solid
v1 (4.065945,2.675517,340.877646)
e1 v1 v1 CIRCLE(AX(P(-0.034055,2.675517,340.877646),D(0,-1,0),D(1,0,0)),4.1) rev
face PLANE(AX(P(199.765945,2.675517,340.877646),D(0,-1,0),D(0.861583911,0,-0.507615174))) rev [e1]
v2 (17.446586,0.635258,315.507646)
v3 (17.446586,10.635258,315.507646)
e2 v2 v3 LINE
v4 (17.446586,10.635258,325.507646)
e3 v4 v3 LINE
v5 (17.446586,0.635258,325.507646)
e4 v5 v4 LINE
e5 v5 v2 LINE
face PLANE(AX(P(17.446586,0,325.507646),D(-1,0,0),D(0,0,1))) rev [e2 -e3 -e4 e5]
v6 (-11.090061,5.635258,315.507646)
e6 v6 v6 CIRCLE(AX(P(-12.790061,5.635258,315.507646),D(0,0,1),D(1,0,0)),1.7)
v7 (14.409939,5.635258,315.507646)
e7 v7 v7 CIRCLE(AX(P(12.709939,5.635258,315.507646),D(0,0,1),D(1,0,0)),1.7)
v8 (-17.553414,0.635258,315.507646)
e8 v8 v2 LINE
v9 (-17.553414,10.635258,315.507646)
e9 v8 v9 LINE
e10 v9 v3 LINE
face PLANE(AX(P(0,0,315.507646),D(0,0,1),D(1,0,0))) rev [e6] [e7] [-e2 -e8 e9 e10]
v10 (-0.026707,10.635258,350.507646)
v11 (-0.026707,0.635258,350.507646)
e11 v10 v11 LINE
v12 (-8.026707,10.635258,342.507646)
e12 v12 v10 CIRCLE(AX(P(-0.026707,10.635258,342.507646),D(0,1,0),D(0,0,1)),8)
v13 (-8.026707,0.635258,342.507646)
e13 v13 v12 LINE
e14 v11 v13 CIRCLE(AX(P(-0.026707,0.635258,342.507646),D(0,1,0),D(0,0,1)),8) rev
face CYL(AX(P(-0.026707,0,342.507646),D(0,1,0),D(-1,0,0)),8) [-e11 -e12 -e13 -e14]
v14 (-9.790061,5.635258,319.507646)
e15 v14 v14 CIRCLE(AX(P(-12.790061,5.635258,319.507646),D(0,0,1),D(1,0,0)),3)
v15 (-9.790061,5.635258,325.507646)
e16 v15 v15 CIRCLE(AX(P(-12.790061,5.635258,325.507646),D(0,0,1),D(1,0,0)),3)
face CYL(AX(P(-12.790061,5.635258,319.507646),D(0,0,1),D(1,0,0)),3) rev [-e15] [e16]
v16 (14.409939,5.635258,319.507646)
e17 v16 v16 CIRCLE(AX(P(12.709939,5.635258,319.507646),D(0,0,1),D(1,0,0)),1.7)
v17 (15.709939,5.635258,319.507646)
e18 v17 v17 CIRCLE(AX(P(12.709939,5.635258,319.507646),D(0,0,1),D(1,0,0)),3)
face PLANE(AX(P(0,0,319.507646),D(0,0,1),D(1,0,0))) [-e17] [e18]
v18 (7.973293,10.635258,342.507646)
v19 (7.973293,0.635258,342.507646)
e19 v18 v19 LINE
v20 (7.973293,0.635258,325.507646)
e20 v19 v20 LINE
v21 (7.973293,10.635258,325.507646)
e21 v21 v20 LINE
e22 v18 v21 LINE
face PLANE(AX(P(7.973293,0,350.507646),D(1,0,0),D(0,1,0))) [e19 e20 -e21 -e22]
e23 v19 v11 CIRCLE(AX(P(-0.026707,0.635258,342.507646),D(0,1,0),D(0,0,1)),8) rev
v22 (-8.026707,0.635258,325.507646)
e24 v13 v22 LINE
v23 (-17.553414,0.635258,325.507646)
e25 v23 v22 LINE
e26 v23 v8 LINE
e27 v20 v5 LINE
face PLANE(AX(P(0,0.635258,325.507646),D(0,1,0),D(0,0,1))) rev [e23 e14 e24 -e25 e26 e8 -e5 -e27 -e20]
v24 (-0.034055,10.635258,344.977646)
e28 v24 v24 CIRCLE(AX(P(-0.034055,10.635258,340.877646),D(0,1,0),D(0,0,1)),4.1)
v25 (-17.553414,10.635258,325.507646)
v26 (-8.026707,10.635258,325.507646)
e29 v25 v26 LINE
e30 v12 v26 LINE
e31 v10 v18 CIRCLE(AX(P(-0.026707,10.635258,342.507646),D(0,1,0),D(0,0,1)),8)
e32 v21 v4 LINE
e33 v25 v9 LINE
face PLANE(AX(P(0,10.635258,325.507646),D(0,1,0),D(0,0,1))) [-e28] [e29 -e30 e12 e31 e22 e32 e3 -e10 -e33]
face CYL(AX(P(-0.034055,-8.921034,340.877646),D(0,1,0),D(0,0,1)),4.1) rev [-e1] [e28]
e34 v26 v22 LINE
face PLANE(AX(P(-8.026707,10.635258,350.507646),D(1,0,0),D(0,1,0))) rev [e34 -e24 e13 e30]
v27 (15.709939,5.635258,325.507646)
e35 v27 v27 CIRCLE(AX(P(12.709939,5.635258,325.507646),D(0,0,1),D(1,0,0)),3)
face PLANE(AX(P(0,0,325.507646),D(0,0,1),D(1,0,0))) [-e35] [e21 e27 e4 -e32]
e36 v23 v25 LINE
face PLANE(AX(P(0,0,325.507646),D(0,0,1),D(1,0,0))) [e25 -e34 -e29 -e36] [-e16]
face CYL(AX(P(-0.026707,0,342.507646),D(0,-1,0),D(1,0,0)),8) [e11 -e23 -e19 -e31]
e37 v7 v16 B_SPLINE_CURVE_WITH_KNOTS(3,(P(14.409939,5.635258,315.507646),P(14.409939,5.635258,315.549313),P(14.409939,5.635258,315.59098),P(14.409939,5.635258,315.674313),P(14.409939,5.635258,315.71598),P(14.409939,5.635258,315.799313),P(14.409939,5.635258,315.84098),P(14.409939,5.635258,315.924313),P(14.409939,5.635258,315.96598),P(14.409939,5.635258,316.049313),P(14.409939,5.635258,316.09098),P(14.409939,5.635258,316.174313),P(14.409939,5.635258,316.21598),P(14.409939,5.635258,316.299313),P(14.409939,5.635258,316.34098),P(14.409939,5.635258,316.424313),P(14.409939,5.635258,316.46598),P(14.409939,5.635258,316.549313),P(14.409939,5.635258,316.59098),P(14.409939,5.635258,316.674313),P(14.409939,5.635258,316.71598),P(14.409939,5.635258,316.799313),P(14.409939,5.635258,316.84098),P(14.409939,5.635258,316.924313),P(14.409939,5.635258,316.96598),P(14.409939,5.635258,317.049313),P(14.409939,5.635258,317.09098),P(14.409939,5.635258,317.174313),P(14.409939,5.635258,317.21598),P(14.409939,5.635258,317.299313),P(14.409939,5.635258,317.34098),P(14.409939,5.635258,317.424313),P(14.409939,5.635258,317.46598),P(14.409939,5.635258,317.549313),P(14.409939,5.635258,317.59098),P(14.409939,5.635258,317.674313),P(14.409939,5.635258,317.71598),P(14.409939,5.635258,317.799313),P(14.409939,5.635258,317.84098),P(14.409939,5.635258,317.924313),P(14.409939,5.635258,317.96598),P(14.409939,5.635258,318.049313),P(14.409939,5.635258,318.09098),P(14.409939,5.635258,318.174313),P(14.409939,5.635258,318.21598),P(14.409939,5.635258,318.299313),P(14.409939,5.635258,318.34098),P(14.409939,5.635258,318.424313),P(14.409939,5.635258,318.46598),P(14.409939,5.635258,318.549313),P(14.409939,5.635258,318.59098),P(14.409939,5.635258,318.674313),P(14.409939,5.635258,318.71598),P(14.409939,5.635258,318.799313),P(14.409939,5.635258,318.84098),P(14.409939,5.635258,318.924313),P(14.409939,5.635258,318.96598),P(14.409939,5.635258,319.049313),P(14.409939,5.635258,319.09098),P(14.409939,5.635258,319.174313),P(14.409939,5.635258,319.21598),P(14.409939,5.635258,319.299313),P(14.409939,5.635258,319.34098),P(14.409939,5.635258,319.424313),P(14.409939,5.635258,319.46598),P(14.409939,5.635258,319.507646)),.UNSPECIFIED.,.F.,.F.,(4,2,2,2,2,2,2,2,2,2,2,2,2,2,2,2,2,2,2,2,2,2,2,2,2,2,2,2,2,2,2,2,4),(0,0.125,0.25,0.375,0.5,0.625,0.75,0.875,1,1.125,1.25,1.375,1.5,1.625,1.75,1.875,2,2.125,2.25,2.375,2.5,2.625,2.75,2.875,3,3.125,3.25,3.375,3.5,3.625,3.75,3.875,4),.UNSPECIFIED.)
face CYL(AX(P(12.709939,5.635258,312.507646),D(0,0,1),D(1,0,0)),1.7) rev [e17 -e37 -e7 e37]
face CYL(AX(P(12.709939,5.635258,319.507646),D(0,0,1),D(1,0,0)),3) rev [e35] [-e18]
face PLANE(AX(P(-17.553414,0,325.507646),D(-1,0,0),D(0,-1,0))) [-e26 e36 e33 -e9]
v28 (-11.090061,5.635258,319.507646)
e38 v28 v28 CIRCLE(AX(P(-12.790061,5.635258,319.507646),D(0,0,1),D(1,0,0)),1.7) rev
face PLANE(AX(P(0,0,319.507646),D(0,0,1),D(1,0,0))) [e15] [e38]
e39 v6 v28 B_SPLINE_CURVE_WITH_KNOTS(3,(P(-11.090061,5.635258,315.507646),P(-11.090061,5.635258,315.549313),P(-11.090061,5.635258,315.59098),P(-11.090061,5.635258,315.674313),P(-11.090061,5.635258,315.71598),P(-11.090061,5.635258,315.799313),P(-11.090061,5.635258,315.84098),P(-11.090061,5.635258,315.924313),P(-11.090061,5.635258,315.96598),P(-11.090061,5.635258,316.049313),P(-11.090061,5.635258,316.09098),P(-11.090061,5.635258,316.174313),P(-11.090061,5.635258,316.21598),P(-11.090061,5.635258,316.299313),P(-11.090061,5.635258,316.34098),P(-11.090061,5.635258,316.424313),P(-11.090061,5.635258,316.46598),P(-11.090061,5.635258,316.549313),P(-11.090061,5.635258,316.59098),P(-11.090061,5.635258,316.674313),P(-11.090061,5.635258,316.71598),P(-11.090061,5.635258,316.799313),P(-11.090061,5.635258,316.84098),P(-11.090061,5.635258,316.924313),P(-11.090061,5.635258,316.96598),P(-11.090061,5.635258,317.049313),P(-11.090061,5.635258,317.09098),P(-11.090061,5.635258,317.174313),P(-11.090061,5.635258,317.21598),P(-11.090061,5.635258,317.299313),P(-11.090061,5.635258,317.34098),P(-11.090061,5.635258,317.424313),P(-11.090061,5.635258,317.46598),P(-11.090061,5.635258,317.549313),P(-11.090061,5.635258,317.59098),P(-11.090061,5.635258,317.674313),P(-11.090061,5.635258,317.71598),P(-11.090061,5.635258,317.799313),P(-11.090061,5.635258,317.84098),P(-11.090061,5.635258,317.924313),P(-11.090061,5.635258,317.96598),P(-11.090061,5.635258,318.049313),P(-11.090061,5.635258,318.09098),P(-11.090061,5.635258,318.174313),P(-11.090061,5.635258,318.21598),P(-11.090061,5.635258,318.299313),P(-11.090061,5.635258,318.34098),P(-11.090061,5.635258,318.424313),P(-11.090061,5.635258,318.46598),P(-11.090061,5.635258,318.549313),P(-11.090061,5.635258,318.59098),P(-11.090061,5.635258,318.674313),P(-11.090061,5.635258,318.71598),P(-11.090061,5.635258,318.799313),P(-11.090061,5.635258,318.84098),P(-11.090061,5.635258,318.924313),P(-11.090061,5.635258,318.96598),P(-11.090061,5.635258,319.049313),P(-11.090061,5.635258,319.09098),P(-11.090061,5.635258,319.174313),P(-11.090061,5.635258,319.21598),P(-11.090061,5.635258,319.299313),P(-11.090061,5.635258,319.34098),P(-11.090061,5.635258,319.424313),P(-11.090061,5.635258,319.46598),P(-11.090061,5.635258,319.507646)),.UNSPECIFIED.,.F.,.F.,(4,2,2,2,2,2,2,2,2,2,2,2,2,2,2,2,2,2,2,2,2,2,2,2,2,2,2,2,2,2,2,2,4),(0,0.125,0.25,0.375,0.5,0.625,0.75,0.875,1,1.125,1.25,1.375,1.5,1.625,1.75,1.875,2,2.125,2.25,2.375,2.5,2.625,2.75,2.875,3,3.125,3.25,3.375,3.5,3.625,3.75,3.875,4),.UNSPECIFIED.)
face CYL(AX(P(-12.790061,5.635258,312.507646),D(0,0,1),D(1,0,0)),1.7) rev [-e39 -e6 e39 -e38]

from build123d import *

# Parameters (mm, degrees)
SKETCH1_W           = 35
SKETCH1_H           = 10
BOSS_EXTRUDE1_DEPTH = 10
SKETCH2_W           = 16
SKETCH2_H           = 10
BOSS_EXTRUDE2_DEPTH = 25
CUT_EXTRUDE3_START  = -7.959741
SKETCH3_R           = 4.1
CUT_EXTRUDE3_DEPTH  = 7.959741
SKETCH4_R           = 1.7
CUT_EXTRUDE4_DEPTH  = 13
SKETCH5_R           = 3
SKETCH5_R_2         = 1.7
CUT_EXTRUDE5_DEPTH  = 6
FILLET1_R           = 8


with BuildPart() as part:
    # Sketch1 → Boss-Extrude1 (new body)
    with BuildSketch(Plane.XY.offset(315.507646495)):
        with Locations((-0.05341426, 5.6352577)):
            Rectangle(SKETCH1_W, SKETCH1_H)
    extrude(amount=BOSS_EXTRUDE1_DEPTH)

    # Sketch2 → Boss-Extrude2 (add)
    with BuildSketch(Plane.XY.offset(325.507646495)):
        with Locations((-0.02670713, 5.6352577)):
            Rectangle(SKETCH2_W, SKETCH2_H)
    extrude(amount=BOSS_EXTRUDE2_DEPTH)

    # Sketch3 → Cut-Extrude3 (cut)
    with BuildSketch(Plane(origin=(0, 10.6352577, 0), x_dir=(1, 0, 0), z_dir=(0, 1, 0)).offset(CUT_EXTRUDE3_START)):
        with Locations(Location((-0.034055406, -340.877646495, 0), (0, 0, 270))):
            Circle(SKETCH3_R)
    extrude(amount=CUT_EXTRUDE3_DEPTH, mode=Mode.SUBTRACT)

    # Sketch4 → Cut-Extrude4 (cut)
    with BuildSketch(Plane.XY.offset(325.507646495)):
        with Locations((-12.790060695, 5.6352577)):
            Circle(SKETCH4_R)
        with Locations((12.709939305, 5.6352577)):
            Circle(SKETCH4_R)
    extrude(amount=-CUT_EXTRUDE4_DEPTH, mode=Mode.SUBTRACT)

    # Sketch5 → Cut-Extrude5 (cut)
    # profile 1 of 2: a face of its own
    with BuildSketch(Plane.XY.offset(325.507646495)):
        with Locations((-12.790060695, 5.6352577)):
            Circle(SKETCH5_R)
        with Locations((-12.790060695, 5.6352577)):
            Circle(SKETCH5_R_2, mode=Mode.SUBTRACT)
    # profile 2 of 2: a face of its own
    with BuildSketch(Plane.XY.offset(325.507646495)):
        with Locations((12.709939305, 5.6352577)):
            Circle(SKETCH5_R)
        with Locations((12.709939305, 5.6352577)):
            Circle(SKETCH5_R_2, mode=Mode.SUBTRACT)
    extrude(amount=-CUT_EXTRUDE5_DEPTH, mode=Mode.SUBTRACT)

    # Fillet1
    fillet1_edges = [part.edges().sort_by_distance(p)[0] for p in [
        (7.97329287, 5.6352577, 350.507646495),
        (-8.02670713, 5.6352577, 350.507646495),
    ]]
    fillet(fillet1_edges, radius=FILLET1_R - 0.0001)  # a hair under: the kernel refuses the full size


solid = part.part
